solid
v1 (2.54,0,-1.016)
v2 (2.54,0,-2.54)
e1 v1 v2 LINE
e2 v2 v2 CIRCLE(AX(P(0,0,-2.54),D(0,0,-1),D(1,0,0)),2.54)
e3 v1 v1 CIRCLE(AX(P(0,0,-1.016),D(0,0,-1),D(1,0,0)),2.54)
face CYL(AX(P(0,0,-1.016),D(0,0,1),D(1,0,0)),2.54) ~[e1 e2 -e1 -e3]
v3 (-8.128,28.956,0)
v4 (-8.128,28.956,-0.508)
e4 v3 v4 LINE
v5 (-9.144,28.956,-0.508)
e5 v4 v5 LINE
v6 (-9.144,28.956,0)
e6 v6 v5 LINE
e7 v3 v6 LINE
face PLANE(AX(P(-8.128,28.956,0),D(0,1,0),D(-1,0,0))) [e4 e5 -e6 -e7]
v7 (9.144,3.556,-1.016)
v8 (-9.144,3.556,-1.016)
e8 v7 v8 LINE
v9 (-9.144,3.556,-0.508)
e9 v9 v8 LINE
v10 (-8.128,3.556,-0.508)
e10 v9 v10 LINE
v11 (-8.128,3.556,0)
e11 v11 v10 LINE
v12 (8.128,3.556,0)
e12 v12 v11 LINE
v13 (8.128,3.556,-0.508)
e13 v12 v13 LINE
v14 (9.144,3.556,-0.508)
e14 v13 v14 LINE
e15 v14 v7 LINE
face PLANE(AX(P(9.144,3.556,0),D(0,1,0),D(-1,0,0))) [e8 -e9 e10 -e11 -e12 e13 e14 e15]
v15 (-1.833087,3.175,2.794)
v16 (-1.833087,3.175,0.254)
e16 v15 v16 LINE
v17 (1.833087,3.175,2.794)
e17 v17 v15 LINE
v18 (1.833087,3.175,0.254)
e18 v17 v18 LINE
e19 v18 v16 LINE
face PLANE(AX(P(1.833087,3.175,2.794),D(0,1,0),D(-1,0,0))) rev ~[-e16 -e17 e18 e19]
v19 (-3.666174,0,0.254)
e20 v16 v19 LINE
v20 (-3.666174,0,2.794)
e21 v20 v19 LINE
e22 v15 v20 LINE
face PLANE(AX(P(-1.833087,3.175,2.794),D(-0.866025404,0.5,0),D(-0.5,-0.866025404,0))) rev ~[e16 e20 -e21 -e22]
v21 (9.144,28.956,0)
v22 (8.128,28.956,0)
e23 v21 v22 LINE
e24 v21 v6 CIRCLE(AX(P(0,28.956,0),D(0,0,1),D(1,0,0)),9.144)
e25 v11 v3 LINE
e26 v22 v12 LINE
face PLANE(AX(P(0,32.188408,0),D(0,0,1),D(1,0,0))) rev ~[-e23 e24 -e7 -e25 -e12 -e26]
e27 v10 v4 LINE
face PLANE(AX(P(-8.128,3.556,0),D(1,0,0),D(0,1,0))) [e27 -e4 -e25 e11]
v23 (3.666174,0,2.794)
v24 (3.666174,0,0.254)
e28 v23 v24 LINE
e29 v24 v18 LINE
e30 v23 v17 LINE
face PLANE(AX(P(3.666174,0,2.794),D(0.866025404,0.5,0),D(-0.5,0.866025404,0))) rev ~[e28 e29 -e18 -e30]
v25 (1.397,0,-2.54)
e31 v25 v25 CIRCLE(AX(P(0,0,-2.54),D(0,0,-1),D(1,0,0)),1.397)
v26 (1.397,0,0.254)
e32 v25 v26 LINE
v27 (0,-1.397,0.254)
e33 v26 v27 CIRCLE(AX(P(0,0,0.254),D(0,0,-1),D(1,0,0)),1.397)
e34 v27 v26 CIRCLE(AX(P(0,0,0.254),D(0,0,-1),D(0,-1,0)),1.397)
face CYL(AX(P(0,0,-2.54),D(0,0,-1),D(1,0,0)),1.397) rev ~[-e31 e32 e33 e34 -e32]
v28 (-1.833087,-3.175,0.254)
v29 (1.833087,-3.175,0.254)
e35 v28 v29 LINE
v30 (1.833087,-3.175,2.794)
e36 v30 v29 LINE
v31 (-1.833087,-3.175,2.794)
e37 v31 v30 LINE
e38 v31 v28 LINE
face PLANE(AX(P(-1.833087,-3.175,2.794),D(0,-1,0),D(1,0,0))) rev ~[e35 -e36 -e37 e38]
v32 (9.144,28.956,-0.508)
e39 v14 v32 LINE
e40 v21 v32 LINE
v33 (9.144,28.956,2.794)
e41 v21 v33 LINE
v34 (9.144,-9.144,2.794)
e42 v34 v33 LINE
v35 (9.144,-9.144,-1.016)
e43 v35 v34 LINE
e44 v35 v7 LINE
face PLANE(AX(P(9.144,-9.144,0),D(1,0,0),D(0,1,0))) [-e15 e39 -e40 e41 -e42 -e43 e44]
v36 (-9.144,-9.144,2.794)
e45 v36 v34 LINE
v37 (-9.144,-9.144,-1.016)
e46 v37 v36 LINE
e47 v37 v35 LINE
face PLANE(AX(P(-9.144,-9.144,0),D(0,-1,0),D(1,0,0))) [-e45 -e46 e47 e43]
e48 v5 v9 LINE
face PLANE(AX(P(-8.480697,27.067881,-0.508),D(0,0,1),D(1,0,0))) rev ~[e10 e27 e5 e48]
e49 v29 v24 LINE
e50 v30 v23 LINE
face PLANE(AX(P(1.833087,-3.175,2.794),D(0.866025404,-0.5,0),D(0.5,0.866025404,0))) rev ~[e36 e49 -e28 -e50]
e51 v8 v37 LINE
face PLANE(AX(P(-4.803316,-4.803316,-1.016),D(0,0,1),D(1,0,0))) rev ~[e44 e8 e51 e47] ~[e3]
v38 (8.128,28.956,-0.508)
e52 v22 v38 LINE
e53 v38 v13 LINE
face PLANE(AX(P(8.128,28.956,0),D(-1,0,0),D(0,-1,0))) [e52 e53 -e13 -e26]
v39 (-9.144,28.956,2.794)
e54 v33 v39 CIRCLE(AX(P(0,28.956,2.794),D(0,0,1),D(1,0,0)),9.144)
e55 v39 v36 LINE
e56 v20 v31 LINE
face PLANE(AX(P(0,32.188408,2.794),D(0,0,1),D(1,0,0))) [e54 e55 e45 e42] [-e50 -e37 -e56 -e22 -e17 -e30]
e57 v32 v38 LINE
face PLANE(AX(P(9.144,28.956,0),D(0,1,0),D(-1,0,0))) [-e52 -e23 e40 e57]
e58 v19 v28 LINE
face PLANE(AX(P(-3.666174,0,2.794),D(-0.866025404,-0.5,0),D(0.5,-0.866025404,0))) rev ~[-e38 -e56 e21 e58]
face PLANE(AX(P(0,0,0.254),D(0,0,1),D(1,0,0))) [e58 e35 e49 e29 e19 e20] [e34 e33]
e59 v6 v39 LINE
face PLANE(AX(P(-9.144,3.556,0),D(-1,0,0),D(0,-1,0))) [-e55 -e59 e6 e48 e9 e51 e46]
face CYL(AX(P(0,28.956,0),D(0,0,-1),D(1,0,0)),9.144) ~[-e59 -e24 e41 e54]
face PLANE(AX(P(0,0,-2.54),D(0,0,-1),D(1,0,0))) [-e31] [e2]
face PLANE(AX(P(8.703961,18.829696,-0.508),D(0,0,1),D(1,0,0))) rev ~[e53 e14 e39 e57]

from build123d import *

# Parameters (mm, degrees)
F0_W     = 1.016
F0_H     = 3.556
F0_H_2   = 5.588
F1_DEPTH = 2.794
F2_DEPTH = 0.508
F3_DEPTH = 1.016
F4_R     = 2.54
F5_DEPTH = 1.524
F6_R     = 1.397
F7_DEPTH = 5.334
F9_DEPTH = 2.54


with BuildPart() as f1:
    # F0 (on Top) → F1 (new body)
    with BuildSketch(Plane.XY):
        with BuildLine():
            Line((8.128, 28.956), (9.144, 28.956))
            ThreePointArc((9.144, 28.956), (0, 38.1), (-9.144, 28.956))
            Line((-9.144, 28.956), (-8.128, 28.956))
            Line((-8.128, 28.956), (-2.54, 28.956))
            ThreePointArc((-2.54, 28.956), (0, 31.496), (2.54, 28.956))
            Line((2.54, 28.956), (8.128, 28.956))
        make_face()
        with BuildLine():
            ThreePointArc((-8.128, 24.7669246844), (0, 19.812), (8.128, 24.7669246844))
            Line((8.128, 24.7669246844), (8.128, 28.956))
            Line((8.128, 28.956), (2.54, 28.956))
            ThreePointArc((2.54, 28.956), (0, 26.416), (-2.54, 28.956))
            Line((-2.54, 28.956), (-8.128, 28.956))
            Line((-8.128, 28.956), (-8.128, 24.7669246844))
        make_face()
        with BuildLine():
            Line((8.128, 24.7669246844), (8.128, 9.144))
            Line((8.128, 9.144), (9.144, 9.144))
            Line((9.144, 9.144), (9.144, 28.956))
            ThreePointArc((9.144, 28.956), (8.8863706877, 26.8007385309), (8.128, 24.7669246844))
        make_face()
        with BuildLine():
            Line((8.128, 28.956), (8.128, 24.7669246844))
            ThreePointArc((8.128, 24.7669246844), (8.8863706877, 26.8007385309), (9.144, 28.956))
            Line((9.144, 28.956), (8.128, 28.956))
        make_face()
        with BuildLine():
            ThreePointArc((-2.54, 28.956), (0, 26.416), (2.54, 28.956))
            Line((2.54, 28.956), (-2.54, 28.956))
        make_face()
        with BuildLine():
            Line((-2.54, 28.956), (2.54, 28.956))
            ThreePointArc((2.54, 28.956), (0, 31.496), (-2.54, 28.956))
        make_face()
        with BuildLine():
            ThreePointArc((-9.144, 28.956), (-8.8863706877, 26.8007385309), (-8.128, 24.7669246844))
            Line((-8.128, 24.7669246844), (-8.128, 28.956))
            Line((-8.128, 28.956), (-9.144, 28.956))
        make_face()
        with BuildLine():
            Line((-9.144, 9.144), (-8.128, 9.144))
            Line((-8.128, 9.144), (-8.128, 24.7669246844))
            ThreePointArc((-8.128, 24.7669246844), (-8.8863706877, 26.8007385309), (-9.144, 28.956))
            Line((-9.144, 28.956), (-9.144, 9.144))
        make_face()
        with BuildLine():
            Line((-8.128, 9.144), (8.128, 9.144))
            Line((8.128, 9.144), (8.128, 24.7669246844))
            ThreePointArc((8.128, 24.7669246844), (0, 19.812), (-8.128, 24.7669246844))
            Line((-8.128, 24.7669246844), (-8.128, 9.144))
        make_face()
        Polygon((-8.128, 3.556), (0, 3.556), (8.128, 3.556), (8.128, 9.144), (-8.128, 9.144), align=None)
        with BuildLine():
            ThreePointArc((-2.54, 0), (-1.7960512242, 1.7960512242), (0, 2.54))
            Line((0, 2.54), (0, 3.556))
            Line((0, 3.556), (-8.128, 3.556))
            Line((-8.128, 3.556), (-8.128, 0))
            Line((-8.128, 0), (-2.54, 0))
        make_face()
        with BuildLine():
            Line((0, -9.144), (0, -2.54))
            ThreePointArc((0, -2.54), (-1.7960512242, -1.7960512242), (-2.54, 0))
            Line((-2.54, 0), (-8.128, 0))
            Line((-8.128, 0), (-9.144, 0))
            Line((-9.144, 0), (-9.144, -9.144))
            Line((-9.144, -9.144), (0, -9.144))
        make_face()
        with Locations((-8.636, 1.778)):
            Rectangle(F0_W, F0_H)
        with BuildLine():
            ThreePointArc((0, 2.54), (1.7960512242, 1.7960512242), (2.54, 0))
            Line((2.54, 0), (8.128, 0))
            Line((8.128, 0), (8.128, 3.556))
            Line((8.128, 3.556), (0, 3.556))
            Line((0, 3.556), (0, 2.54))
        make_face()
        with Locations((8.636, 1.778)):
            Rectangle(F0_W, F0_H)
        with BuildLine():
            Line((8.128, 0), (2.54, 0))
            ThreePointArc((2.54, 0), (1.7960512242, -1.7960512242), (0, -2.54))
            Line((0, -2.54), (0, -9.144))
            Line((0, -9.144), (9.144, -9.144))
            Line((9.144, -9.144), (9.144, 0))
            Line((9.144, 0), (8.128, 0))
        make_face()
        with BuildLine():
            ThreePointArc((0, -2.54), (1.7960512242, -1.7960512242), (2.54, 0))
            Line((2.54, 0), (0, 0))
            Line((0, 0), (-2.54, 0))
            ThreePointArc((-2.54, 0), (-1.7960512242, -1.7960512242), (0, -2.54))
        make_face()
        with BuildLine():
            Line((0, 0), (2.54, 0))
            ThreePointArc((2.54, 0), (1.7960512242, 1.7960512242), (0, 2.54))
            ThreePointArc((0, 2.54), (-1.7960512242, 1.7960512242), (-2.54, 0))
            Line((-2.54, 0), (0, 0))
        make_face()
        with Locations((-8.636, 6.35)):
            Rectangle(F0_W, F0_H_2)
        with Locations((8.636, 6.35)):
            Rectangle(F0_W, F0_H_2)
    extrude(amount=F1_DEPTH)

    # F0 (on Top) → F2 (join)
    with BuildSketch(Plane.XY):
        with BuildLine():
            ThreePointArc((-9.144, 28.956), (-8.8863706877, 26.8007385309), (-8.128, 24.7669246844))
            Line((-8.128, 24.7669246844), (-8.128, 28.956))
            Line((-8.128, 28.956), (-9.144, 28.956))
        make_face()
        with BuildLine():
            Line((-9.144, 9.144), (-8.128, 9.144))
            Line((-8.128, 9.144), (-8.128, 24.7669246844))
            ThreePointArc((-8.128, 24.7669246844), (-8.8863706877, 26.8007385309), (-9.144, 28.956))
            Line((-9.144, 28.956), (-9.144, 9.144))
        make_face()
        with BuildLine():
            Line((8.128, 24.7669246844), (8.128, 9.144))
            Line((8.128, 9.144), (9.144, 9.144))
            Line((9.144, 9.144), (9.144, 28.956))
            ThreePointArc((9.144, 28.956), (8.8863706877, 26.8007385309), (8.128, 24.7669246844))
        make_face()
        with BuildLine():
            Line((8.128, 28.956), (8.128, 24.7669246844))
            ThreePointArc((8.128, 24.7669246844), (8.8863706877, 26.8007385309), (9.144, 28.956))
            Line((9.144, 28.956), (8.128, 28.956))
        make_face()
        with Locations((-8.636, 6.35)):
            Rectangle(F0_W, F0_H_2)
        with Locations((8.636, 6.35)):
            Rectangle(F0_W, F0_H_2)
    extrude(amount=-F2_DEPTH)

    # F0 (on Top) → F3 (join)
    with BuildSketch(Plane.XY):
        with BuildLine():
            Line((0, -9.144), (0, -2.54))
            ThreePointArc((0, -2.54), (-1.7960512242, -1.7960512242), (-2.54, 0))
            Line((-2.54, 0), (-8.128, 0))
            Line((-8.128, 0), (-9.144, 0))
            Line((-9.144, 0), (-9.144, -9.144))
            Line((-9.144, -9.144), (0, -9.144))
        make_face()
        with BuildLine():
            ThreePointArc((-2.54, 0), (-1.7960512242, 1.7960512242), (0, 2.54))
            Line((0, 2.54), (0, 3.556))
            Line((0, 3.556), (-8.128, 3.556))
            Line((-8.128, 3.556), (-8.128, 0))
            Line((-8.128, 0), (-2.54, 0))
        make_face()
        with BuildLine():
            ThreePointArc((0, -2.54), (1.7960512242, -1.7960512242), (2.54, 0))
            Line((2.54, 0), (0, 0))
            Line((0, 0), (-2.54, 0))
            ThreePointArc((-2.54, 0), (-1.7960512242, -1.7960512242), (0, -2.54))
        make_face()
        with BuildLine():
            Line((0, 0), (2.54, 0))
            ThreePointArc((2.54, 0), (1.7960512242, 1.7960512242), (0, 2.54))
            ThreePointArc((0, 2.54), (-1.7960512242, 1.7960512242), (-2.54, 0))
            Line((-2.54, 0), (0, 0))
        make_face()
        with BuildLine():
            ThreePointArc((0, 2.54), (1.7960512242, 1.7960512242), (2.54, 0))
            Line((2.54, 0), (8.128, 0))
            Line((8.128, 0), (8.128, 3.556))
            Line((8.128, 3.556), (0, 3.556))
            Line((0, 3.556), (0, 2.54))
        make_face()
        with BuildLine():
            Line((8.128, 0), (2.54, 0))
            ThreePointArc((2.54, 0), (1.7960512242, -1.7960512242), (0, -2.54))
            Line((0, -2.54), (0, -9.144))
            Line((0, -9.144), (9.144, -9.144))
            Line((9.144, -9.144), (9.144, 0))
            Line((9.144, 0), (8.128, 0))
        make_face()
        with Locations((-8.636, 1.778)):
            Rectangle(F0_W, F0_H)
        with Locations((8.636, 1.778)):
            Rectangle(F0_W, F0_H)
    extrude(amount=-F3_DEPTH)

    # F4 (on face) → F5 (join)
    with BuildSketch(Plane(origin=(0, 0, -1.016), x_dir=(1, 0, 0), z_dir=(0, 0, -1))):
        Circle(F4_R)
    extrude(amount=F5_DEPTH)

    # F6 (on face) → F7 (cut, through all)
    with BuildSketch(Plane(origin=(0, 0, -2.54), x_dir=(1, 0, 0), z_dir=(0, 0, -1))):
        Circle(F6_R)
    extrude(amount=-F7_DEPTH, mode=Mode.SUBTRACT)

    # F8 (on face) → F9 (cut)
    with BuildSketch(Plane.XY.offset(2.794)):
        Polygon((-1.8330871047, -3.175), (0, -3.175), (1.8330871047, -3.175), (3.6661742094, 0), (1.8330871047, 3.175), (-1.8330871047, 3.175), (-3.6661742094, 0), align=None)
        with BuildLine():
            ThreePointArc((1.397, 0), (0.9878281733, -0.9878281733), (0, -1.397))
            ThreePointArc((0, -1.397), (-0.9878281733, 0.9878281733), (1.397, 0))
        make_face(mode=Mode.SUBTRACT)
    extrude(amount=-F9_DEPTH, mode=Mode.SUBTRACT)


solid = f1.part
